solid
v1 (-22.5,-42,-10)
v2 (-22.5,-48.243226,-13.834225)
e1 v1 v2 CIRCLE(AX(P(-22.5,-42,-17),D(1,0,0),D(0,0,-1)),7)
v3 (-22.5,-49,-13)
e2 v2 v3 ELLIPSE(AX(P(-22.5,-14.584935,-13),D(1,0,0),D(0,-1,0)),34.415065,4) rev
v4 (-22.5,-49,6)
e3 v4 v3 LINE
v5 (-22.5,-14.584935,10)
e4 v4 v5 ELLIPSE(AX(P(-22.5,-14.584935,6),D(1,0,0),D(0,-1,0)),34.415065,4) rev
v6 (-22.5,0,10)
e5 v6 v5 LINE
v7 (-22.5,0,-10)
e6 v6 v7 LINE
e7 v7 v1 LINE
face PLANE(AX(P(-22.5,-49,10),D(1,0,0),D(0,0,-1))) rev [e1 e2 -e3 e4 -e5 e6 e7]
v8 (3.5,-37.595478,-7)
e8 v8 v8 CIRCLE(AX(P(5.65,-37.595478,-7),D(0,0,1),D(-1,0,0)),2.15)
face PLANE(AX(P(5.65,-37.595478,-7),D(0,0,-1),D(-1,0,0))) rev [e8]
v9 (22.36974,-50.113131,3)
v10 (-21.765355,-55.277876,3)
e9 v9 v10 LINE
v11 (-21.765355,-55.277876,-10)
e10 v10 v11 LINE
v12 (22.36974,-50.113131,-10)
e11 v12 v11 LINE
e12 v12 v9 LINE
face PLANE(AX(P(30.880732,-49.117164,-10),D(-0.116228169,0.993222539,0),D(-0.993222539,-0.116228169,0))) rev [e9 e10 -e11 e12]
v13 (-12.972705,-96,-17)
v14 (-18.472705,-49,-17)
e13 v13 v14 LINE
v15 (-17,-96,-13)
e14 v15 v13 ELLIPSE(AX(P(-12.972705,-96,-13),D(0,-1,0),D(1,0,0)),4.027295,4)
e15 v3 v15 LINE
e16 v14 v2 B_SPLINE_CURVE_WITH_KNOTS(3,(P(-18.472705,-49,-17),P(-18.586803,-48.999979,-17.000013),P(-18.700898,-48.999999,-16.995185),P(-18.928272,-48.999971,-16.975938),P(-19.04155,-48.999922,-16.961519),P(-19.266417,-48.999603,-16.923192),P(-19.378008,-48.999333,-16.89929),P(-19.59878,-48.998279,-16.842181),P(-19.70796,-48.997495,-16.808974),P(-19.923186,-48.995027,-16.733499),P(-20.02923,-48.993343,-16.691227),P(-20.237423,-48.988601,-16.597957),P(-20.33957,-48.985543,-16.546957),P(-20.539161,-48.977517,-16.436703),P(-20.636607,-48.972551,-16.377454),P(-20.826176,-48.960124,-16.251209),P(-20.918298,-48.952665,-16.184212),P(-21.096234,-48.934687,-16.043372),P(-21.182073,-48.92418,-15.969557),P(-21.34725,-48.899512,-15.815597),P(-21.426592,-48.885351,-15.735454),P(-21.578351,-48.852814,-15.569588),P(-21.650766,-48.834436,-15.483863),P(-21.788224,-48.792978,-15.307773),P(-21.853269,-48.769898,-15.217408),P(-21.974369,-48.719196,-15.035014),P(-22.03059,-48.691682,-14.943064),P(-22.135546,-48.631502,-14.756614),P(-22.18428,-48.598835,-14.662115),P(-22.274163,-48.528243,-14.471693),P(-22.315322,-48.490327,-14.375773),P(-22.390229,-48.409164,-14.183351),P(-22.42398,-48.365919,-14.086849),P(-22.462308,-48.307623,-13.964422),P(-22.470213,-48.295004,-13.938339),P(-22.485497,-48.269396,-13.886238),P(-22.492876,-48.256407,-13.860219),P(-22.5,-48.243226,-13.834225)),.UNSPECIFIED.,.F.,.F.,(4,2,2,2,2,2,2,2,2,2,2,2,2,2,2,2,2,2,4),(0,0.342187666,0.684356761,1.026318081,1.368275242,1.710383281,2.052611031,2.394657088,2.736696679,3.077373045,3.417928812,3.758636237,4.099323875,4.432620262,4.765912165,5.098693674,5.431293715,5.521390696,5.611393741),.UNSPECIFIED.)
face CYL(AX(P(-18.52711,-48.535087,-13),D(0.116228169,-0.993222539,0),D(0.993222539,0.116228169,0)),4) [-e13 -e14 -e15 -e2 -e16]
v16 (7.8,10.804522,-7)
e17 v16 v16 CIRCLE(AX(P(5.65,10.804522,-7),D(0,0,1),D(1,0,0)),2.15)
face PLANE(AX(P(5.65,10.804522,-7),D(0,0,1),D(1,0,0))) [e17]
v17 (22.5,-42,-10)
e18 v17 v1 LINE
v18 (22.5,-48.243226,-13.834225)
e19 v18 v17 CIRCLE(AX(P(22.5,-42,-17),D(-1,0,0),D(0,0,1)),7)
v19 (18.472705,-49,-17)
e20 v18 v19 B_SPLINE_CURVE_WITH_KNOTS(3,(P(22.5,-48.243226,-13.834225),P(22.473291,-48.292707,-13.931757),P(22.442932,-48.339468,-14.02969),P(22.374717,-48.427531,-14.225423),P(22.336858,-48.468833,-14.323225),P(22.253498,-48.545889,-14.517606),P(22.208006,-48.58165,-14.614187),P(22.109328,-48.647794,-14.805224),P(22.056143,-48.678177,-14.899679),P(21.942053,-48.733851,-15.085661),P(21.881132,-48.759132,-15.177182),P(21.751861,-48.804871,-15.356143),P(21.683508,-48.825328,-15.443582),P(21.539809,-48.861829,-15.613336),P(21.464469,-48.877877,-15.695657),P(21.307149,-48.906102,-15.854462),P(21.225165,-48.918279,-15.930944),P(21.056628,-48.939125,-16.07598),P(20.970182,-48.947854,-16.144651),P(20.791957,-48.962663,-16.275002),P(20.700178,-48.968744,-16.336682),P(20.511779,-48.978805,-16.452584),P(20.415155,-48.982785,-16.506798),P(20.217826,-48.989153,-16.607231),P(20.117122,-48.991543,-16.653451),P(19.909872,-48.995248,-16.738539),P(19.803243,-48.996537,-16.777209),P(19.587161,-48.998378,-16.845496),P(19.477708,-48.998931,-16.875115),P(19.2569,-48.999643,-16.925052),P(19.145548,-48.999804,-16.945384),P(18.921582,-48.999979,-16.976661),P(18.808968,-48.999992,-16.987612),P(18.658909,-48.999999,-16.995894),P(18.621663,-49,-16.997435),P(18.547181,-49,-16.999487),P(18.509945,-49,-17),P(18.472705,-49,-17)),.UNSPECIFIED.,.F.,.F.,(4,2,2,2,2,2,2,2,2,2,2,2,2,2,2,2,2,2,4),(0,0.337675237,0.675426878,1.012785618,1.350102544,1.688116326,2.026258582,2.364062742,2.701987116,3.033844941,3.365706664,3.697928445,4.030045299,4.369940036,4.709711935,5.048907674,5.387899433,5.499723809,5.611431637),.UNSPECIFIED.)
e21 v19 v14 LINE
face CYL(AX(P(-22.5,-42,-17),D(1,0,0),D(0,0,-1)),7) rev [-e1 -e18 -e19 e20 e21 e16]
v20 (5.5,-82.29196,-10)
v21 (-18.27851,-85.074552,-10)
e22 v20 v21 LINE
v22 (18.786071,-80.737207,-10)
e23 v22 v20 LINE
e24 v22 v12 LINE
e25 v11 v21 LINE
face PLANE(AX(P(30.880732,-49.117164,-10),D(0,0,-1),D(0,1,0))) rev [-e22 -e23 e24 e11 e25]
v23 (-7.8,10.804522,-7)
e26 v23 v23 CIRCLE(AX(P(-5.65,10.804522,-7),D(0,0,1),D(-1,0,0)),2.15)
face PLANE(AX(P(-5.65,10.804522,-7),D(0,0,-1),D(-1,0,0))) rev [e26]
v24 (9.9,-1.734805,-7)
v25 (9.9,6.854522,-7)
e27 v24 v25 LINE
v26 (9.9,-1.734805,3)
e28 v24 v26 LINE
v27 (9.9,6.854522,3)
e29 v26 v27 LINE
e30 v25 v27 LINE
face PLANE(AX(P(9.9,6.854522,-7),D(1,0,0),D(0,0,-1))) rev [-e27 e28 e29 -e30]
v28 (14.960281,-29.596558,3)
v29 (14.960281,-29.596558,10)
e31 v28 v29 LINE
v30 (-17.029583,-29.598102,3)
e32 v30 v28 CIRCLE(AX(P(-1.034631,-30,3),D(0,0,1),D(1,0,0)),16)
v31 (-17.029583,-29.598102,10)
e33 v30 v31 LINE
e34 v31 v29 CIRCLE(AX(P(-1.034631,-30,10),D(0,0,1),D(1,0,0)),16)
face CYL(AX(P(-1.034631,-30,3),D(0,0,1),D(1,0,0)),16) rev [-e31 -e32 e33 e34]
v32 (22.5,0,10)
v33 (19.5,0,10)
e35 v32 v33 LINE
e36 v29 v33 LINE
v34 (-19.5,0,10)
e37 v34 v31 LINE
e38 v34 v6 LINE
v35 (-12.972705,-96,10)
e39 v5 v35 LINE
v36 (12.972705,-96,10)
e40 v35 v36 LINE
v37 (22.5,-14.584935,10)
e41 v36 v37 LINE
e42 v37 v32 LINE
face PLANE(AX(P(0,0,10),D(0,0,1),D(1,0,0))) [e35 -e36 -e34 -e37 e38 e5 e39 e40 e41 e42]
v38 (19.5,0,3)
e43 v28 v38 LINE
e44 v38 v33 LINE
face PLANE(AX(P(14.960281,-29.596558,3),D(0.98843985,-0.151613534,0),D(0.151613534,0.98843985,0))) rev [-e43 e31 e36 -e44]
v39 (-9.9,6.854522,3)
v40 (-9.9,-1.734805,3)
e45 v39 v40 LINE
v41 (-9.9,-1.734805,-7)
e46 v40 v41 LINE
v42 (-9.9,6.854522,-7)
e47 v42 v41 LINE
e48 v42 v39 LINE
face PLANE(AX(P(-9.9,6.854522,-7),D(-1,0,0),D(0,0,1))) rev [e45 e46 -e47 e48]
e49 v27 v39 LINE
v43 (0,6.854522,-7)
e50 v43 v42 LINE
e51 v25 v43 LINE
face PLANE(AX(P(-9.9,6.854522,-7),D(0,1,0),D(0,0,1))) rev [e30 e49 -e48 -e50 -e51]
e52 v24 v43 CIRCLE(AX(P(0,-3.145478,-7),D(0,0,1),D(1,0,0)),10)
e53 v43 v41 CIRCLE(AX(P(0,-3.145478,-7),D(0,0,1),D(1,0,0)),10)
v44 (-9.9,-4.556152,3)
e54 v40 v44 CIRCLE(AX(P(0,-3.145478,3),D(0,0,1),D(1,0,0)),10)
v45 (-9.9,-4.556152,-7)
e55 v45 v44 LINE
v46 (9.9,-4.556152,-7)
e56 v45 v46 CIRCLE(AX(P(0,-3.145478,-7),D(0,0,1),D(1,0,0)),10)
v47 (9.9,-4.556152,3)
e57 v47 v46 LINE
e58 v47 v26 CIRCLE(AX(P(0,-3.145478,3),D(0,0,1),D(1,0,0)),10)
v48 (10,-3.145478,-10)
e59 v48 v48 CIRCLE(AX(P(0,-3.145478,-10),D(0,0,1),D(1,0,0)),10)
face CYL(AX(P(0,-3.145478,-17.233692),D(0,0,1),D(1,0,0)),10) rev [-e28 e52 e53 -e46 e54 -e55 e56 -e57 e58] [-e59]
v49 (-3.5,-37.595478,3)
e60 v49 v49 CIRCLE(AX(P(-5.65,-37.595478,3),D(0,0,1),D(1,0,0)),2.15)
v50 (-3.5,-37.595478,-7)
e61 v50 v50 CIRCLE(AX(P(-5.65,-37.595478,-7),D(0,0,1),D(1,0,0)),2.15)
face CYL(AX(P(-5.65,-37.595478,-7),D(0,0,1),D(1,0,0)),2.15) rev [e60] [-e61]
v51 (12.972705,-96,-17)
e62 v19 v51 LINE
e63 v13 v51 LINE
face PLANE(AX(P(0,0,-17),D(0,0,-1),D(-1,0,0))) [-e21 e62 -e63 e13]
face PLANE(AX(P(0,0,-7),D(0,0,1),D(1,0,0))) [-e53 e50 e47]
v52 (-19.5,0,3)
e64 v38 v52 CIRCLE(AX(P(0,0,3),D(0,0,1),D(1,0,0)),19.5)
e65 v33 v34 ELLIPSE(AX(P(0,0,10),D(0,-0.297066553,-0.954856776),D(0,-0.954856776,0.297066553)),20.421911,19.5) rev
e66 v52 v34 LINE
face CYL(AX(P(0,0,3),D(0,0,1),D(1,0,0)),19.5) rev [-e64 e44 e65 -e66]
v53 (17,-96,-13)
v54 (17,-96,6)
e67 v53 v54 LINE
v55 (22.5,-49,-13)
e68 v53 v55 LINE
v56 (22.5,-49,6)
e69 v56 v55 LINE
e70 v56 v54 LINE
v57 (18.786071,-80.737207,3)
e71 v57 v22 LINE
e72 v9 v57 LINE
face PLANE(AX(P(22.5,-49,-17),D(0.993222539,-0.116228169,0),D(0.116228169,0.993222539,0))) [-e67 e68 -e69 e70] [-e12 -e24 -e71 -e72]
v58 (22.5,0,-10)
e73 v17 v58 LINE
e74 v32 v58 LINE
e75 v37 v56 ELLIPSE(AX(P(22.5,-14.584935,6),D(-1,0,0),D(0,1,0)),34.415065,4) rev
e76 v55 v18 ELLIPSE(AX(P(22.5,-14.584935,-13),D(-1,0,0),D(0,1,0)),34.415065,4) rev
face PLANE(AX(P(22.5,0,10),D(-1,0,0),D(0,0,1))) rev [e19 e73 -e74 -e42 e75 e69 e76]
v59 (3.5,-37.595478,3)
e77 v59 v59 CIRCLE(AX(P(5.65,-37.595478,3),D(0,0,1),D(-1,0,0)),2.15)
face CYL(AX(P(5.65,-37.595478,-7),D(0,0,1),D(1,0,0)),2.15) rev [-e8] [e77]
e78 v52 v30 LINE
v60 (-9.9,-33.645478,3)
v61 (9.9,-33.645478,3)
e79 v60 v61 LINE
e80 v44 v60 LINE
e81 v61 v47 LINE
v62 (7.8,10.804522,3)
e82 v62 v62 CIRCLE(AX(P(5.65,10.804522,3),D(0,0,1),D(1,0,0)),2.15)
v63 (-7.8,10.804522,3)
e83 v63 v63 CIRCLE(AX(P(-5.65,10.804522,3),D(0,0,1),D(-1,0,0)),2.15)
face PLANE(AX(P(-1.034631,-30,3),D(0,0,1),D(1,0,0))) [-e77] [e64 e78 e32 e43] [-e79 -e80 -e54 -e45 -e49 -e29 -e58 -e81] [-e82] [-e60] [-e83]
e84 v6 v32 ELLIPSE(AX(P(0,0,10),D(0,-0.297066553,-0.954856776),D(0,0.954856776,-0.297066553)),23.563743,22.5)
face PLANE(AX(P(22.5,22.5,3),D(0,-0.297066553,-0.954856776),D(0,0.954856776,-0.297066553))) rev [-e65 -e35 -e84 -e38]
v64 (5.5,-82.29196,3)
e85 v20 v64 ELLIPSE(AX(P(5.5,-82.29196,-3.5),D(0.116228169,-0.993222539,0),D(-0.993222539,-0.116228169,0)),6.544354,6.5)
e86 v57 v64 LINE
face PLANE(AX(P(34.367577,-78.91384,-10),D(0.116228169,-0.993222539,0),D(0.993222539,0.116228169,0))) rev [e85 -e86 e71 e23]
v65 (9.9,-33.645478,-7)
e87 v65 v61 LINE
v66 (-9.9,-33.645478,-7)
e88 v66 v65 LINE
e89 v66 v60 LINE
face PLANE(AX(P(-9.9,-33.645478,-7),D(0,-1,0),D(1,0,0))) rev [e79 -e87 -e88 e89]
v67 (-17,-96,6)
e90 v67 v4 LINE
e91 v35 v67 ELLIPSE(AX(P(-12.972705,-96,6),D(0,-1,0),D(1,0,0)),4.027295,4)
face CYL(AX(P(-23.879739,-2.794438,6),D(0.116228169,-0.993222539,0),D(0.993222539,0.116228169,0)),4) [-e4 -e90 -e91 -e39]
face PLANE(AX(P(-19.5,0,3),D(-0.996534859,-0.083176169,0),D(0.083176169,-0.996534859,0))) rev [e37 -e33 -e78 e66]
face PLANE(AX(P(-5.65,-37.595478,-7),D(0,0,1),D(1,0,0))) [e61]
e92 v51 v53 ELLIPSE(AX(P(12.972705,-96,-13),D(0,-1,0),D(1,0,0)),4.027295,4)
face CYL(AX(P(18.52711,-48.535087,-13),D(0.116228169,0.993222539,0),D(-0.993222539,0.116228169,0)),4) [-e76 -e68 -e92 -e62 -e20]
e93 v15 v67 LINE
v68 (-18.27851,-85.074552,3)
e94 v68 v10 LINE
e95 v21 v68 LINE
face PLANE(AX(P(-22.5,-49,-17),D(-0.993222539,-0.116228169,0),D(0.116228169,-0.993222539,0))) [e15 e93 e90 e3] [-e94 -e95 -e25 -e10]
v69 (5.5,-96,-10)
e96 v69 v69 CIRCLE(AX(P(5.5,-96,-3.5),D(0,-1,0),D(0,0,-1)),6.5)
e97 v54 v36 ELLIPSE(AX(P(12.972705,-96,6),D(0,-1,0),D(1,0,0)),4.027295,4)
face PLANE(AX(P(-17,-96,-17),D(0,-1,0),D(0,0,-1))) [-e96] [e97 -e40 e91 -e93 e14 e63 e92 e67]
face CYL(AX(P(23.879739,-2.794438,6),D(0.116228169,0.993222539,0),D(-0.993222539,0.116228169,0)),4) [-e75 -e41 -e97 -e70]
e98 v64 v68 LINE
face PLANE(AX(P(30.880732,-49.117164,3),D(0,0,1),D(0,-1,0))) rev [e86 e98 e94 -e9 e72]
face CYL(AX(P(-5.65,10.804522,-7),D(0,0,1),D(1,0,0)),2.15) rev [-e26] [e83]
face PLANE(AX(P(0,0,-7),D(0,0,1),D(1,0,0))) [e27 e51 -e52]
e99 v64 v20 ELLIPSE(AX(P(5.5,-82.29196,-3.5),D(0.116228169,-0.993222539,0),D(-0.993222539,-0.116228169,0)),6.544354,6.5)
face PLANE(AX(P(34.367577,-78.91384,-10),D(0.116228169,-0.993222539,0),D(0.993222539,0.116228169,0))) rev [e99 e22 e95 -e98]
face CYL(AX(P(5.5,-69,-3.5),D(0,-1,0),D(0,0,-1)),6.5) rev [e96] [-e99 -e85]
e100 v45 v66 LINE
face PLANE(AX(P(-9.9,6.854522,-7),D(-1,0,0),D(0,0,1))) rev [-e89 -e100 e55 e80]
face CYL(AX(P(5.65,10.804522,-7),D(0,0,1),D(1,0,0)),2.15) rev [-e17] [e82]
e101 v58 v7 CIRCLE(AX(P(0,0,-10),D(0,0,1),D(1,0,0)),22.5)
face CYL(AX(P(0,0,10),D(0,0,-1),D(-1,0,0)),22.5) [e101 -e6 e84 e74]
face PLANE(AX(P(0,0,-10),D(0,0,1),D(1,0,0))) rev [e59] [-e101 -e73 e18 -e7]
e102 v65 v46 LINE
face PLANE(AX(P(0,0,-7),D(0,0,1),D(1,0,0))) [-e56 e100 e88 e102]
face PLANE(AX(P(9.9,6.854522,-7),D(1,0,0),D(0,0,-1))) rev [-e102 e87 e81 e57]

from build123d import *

# Parameters (mm, degrees)
BOSS_EXTRUDE1_DEPTH     = 10
CUT_EXTRUDE1_DEPTH      = 7
CUT_EXTRUDE3_DEPTH      = 55.838398955
CUT_EXTRUDE3_DEPTH_BACK = 55.838398955
BOSS_EXTRUDE2_DEPTH     = 27
SKETCH6_W               = 13
SKETCH6_H               = 30
CUT_EXTRUDE4_DEPTH      = 107.88879918
FILLET1_R               = 7
FILLET2_R               = 4
SKETCH8_R               = 6.5
CUT_EXTRUDE5_DEPTH      = 27
SKETCH11_R              = 2.15
SKETCH11_W              = 19.8
SKETCH11_H              = 40.5
CUT_EXTRUDE7_DEPTH      = 10
CUT_EXTRUDE8_DEPTH      = 101.056234307
CUT_EXTRUDE8_DEPTH_BACK = 101.056234307
SKETCH12_R              = 10


with BuildPart() as part:
    # Sketch1 → Boss-Extrude1 (new, symmetric)
    with BuildSketch(Plane.XY):
        with BuildLine():
            Line((22.5, 0), (22.5, -49))
            Line((22.5, -49), (-22.5, -49))
            Line((-22.5, -49), (-22.5, 0))
            ThreePointArc((-22.5, 0), (0, 22.5), (22.5, 0))
        make_face()
    extrude(amount=BOSS_EXTRUDE1_DEPTH, both=True)

    # Sketch2 → Cut-Extrude1 (cut)
    with BuildSketch(Plane.XY.offset(10)):
        with BuildLine():
            Line((-19.5, 0), (-17.029582922, -29.598102078))
            ThreePointArc((-17.029582922, -29.598102078), (-1.033858787, -46), (14.96028148, -29.596557582))
            Line((14.96028148, -29.596557582), (19.5, 0))
            ThreePointArc((19.5, 0), (0, 19.5), (-19.5, 0))
        make_face()
    extrude(amount=-CUT_EXTRUDE1_DEPTH, mode=Mode.SUBTRACT)

    # Sketch4 → Cut-Extrude3 (cut, two sides: drawn at the far end of the back side and taken through both)
    with BuildSketch(Plane.ZY.offset(-CUT_EXTRUDE3_DEPTH_BACK)):
        Polygon((10, 0), (10, 22.5), (3, 22.5), align=None)
    extrude(amount=CUT_EXTRUDE3_DEPTH + CUT_EXTRUDE3_DEPTH_BACK, mode=Mode.SUBTRACT)

    # Sketch5 → Boss-Extrude2 (add)
    with BuildSketch(Plane.XY.offset(10)):
        Polygon((-17, -96), (17, -96), (22.5, -49), (-22.5, -49), align=None)
    extrude(amount=-BOSS_EXTRUDE2_DEPTH)

    # Sketch6 → Cut-Extrude4 (cut, through all)
    with BuildSketch(Plane(origin=(-27.852629229, -3.259350229, 0), x_dir=(0, 0, 1), z_dir=(-0.9932225393212899, -0.11622816949504453, 0))):
        with Locations((-3.5, -67.373484893)):
            Rectangle(SKETCH6_W, SKETCH6_H)
    extrude(amount=-CUT_EXTRUDE4_DEPTH, mode=Mode.SUBTRACT)

    # Fillet1
    # the kernel refuses this fillet: 7 mm, written as the material it adds along each edge
    with BuildSketch(Plane(origin=(22.5, -49, -10), x_dir=(0, 1, 0), z_dir=(-1, 0, 0))) as fillet1_piece_1_section:
        with BuildLine():
            CenterArc((FILLET1_R, FILLET1_R), FILLET1_R, 180, 90)
            Line((0, FILLET1_R), (0, 0))
            Line((0, 0), (FILLET1_R, 0))
        make_face()
    fillet1_piece_1 = extrude(amount=45, mode=Mode.PRIVATE)
    fillet1_piece_1 = split(fillet1_piece_1, bisect_by=Plane(origin=(22.378999484, -50.034004412, -11.584712056), z_dir=(-0.9932225393212899, 0.11622816949504457, 0)), keep=Keep.TOP, mode=Mode.PRIVATE)
    fillet1_piece_1 = split(fillet1_piece_1, bisect_by=Plane(origin=(-22.378999484, -50.034004412, -11.584712056), z_dir=(0.9932225393212899, 0.11622816949504457, 0)), keep=Keep.TOP, mode=Mode.PRIVATE)
    add(fillet1_piece_1)

    # Fillet2
    fillet2_edges = [part.edges().sort_by_distance(p)[0] for p in [
        (19.75, -72.5, -17),
        (-19.75, -72.5, -17),
        (-19.75, -72.5, 10),
        (19.75, -72.5, 10),
    ]]
    fillet(fillet2_edges, radius=FILLET2_R)

    # Sketch8 → Cut-Extrude5 (cut)
    with BuildSketch(Plane.XZ.offset(96)):
        with Locations(Location((5.5, -3.5, 0), (0, 0, 270))):
            Circle(SKETCH8_R)
    extrude(amount=-CUT_EXTRUDE5_DEPTH, mode=Mode.SUBTRACT)

    # Sketch11 → Cut-Extrude7 (cut)
    with BuildSketch(Plane.XY.offset(3)):
        with Locations((5.65, 10.804521868)):
            Circle(SKETCH11_R)
        with Locations(Location((-5.65, 10.804521868, 0), (0, 0, 180))):
            Circle(SKETCH11_R)
        with Locations(Location((5.65, -37.595478132, 0), (0, 0, 180))):
            Circle(SKETCH11_R)
        with Locations((-5.65, -37.595478132)):
            Circle(SKETCH11_R)
        with Locations((0, -13.395478132)):
            Rectangle(SKETCH11_W, SKETCH11_H)
    extrude(amount=-CUT_EXTRUDE7_DEPTH, mode=Mode.SUBTRACT)

    # Sketch12 → Cut-Extrude8 (cut, two sides: drawn at the far end of the back side and taken through both)
    with BuildSketch(Plane.XY.offset(-7).offset(-CUT_EXTRUDE8_DEPTH_BACK)):
        with Locations((0, -3.145478132)):
            Circle(SKETCH12_R)
    extrude(amount=CUT_EXTRUDE8_DEPTH + CUT_EXTRUDE8_DEPTH_BACK, mode=Mode.SUBTRACT)


solid = part.part
